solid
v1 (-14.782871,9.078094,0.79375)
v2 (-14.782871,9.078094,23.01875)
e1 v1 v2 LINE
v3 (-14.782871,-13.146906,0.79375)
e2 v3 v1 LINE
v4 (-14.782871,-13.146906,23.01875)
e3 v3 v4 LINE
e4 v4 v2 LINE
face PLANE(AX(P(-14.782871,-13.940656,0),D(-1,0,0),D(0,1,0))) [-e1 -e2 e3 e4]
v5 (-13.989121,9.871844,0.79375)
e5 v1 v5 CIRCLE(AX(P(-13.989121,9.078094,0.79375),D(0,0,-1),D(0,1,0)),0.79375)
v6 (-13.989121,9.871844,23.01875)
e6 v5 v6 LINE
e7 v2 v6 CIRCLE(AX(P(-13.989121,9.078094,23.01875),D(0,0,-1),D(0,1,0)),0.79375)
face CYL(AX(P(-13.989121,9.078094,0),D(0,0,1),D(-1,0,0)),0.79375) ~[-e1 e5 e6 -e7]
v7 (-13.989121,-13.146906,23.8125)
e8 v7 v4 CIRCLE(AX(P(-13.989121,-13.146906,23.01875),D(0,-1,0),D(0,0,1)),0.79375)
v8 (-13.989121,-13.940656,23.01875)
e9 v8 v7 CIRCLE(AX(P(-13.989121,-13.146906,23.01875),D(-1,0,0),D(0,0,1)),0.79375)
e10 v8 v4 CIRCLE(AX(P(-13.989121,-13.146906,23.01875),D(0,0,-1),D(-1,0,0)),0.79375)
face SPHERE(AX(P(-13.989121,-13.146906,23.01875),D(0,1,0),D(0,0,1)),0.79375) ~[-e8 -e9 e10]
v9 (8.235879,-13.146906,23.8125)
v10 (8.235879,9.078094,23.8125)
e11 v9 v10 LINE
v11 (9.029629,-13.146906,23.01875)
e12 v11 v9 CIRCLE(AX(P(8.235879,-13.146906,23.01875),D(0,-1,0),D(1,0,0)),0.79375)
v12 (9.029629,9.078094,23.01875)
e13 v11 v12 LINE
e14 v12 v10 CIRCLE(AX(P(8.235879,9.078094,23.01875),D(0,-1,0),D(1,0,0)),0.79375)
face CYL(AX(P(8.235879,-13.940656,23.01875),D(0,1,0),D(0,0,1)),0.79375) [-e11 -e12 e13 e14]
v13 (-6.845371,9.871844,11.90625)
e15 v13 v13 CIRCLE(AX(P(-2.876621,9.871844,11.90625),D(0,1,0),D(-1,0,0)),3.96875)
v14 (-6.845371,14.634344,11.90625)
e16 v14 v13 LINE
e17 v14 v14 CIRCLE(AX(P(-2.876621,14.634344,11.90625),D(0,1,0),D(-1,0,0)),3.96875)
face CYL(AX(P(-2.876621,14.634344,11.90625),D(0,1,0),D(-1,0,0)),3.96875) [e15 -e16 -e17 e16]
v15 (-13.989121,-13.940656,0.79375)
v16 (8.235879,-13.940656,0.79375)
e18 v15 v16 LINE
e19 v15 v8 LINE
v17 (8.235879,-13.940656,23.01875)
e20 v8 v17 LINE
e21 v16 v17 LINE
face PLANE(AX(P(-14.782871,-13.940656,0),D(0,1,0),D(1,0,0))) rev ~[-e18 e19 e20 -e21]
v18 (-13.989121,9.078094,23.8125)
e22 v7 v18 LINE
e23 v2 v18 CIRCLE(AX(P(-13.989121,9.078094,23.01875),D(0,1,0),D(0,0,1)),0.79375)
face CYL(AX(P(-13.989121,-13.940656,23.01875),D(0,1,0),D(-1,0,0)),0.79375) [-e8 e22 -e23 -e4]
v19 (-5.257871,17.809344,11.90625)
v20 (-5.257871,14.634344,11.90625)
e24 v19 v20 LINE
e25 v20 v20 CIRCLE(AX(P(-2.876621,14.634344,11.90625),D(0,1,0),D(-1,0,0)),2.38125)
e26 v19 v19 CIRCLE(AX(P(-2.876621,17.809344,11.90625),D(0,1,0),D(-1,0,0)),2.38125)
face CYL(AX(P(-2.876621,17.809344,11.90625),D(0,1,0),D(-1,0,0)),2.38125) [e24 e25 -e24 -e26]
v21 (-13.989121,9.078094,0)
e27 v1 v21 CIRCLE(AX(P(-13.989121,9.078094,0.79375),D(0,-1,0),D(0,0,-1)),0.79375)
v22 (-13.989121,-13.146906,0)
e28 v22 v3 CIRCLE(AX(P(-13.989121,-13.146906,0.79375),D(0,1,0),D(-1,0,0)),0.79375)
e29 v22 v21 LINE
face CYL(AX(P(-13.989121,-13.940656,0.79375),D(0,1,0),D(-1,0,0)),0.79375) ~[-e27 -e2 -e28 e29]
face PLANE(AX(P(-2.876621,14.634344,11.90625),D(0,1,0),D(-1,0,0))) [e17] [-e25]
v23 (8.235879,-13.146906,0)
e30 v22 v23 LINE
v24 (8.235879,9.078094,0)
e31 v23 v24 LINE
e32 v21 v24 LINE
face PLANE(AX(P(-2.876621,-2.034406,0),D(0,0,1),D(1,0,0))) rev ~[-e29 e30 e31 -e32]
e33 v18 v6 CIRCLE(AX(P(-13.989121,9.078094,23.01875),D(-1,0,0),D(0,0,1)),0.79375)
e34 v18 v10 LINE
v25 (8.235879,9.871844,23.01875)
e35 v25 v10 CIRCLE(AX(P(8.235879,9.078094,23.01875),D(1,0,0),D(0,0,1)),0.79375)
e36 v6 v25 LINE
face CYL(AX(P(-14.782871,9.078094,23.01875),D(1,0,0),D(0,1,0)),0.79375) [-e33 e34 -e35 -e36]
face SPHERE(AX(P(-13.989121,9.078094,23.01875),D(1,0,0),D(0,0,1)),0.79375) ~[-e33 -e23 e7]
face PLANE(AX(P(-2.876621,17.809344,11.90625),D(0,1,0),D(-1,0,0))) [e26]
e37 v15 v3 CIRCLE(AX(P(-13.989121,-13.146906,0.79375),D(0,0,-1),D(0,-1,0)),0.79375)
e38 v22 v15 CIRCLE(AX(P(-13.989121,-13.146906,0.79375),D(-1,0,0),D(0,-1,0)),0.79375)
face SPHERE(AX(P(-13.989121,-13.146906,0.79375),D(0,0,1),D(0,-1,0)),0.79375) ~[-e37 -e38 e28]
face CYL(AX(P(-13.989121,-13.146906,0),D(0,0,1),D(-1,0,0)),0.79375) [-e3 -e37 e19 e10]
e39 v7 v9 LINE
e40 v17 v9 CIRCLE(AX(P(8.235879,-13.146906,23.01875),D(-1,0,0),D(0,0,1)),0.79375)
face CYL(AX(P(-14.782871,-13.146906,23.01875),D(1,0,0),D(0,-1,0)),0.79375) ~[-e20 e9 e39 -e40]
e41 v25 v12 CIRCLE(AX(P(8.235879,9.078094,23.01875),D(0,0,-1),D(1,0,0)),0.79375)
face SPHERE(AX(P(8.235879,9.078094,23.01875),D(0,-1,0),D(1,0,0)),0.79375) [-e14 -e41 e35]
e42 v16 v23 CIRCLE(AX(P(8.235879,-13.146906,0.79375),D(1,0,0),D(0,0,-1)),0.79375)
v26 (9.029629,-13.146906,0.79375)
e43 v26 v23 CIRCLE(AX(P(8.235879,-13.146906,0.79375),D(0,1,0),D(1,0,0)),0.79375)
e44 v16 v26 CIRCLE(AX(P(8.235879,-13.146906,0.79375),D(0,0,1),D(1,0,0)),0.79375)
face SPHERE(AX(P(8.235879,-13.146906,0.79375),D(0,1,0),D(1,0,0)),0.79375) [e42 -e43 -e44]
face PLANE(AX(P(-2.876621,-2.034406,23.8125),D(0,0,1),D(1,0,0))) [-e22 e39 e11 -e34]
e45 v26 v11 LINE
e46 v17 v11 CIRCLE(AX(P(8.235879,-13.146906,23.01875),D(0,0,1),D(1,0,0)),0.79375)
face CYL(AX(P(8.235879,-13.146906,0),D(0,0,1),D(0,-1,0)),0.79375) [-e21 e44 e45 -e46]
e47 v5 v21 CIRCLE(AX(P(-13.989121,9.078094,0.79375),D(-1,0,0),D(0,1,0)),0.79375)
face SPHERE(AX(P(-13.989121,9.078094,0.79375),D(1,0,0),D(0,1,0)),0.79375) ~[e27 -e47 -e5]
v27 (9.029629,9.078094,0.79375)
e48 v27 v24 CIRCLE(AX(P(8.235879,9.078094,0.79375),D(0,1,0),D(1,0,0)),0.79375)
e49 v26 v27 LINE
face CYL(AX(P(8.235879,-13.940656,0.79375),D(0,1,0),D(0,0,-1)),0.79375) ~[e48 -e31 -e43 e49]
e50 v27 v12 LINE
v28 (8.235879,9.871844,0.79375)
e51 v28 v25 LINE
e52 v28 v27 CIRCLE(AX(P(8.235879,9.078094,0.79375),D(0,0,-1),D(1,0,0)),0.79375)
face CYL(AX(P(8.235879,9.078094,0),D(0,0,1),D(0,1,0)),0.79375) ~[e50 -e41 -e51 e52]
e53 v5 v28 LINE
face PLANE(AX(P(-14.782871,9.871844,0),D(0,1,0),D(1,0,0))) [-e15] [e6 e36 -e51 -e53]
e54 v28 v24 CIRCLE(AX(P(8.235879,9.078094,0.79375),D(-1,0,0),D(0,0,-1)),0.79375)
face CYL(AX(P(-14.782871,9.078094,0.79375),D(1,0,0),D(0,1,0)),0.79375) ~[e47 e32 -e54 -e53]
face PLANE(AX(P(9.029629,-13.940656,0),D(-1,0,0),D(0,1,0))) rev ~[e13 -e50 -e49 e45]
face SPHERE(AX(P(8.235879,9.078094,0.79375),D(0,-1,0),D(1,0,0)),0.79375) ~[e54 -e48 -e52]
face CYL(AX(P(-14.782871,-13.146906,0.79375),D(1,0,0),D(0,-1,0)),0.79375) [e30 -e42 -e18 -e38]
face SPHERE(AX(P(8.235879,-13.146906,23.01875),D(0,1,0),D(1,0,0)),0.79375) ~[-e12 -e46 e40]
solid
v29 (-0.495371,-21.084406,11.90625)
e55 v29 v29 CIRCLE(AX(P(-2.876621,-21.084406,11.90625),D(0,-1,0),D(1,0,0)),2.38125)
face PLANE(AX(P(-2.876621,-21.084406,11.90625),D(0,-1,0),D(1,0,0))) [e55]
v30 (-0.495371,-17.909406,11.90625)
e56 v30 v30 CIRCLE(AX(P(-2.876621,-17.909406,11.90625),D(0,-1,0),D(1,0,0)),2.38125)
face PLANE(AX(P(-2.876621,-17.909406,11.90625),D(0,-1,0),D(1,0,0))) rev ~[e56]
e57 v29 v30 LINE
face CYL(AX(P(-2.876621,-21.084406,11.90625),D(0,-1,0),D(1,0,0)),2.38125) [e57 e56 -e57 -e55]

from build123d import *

# Parameters (mm, degrees)
F0_W      = 23.8125
F0_H      = 23.8125
F1_DEPTH  = 23.8125
F6_R      = 2.38125
F7_DEPTH  = 3.175
F9_R      = 3.96875
F10_DEPTH = 4.7625
F12_R     = 2.38125
F13_DEPTH = 3.175
F14_R     = 0.79375


# Not quite as in the source:
# - a length typed as a fraction of an inch, garbled in the dataset ("3 / 203.2 mm" for 3/8 in), is restored
# - the program builds the solid bodies; features that only make, move or delete a surface that nothing else refers to are left out


with BuildPart() as f1:
    # F0 (on Top) → F1 (new body)
    with BuildSketch(Plane.XY):
        with Locations((-2.8766207397, -2.0344056764)):
            Rectangle(F0_W, F0_H)
    extrude(amount=F1_DEPTH)

    # F9 (on offset) → F10 (join)
    with BuildSketch(Plane(origin=(0, 14.6343443236, 0), x_dir=(-1, 0, 0), z_dir=(0, 1, 0))):
        with Locations((2.8766207397, 11.90625)):
            Circle(F9_R)
    extrude(amount=-F10_DEPTH)

    # F12 (on offset) → F13 (join)
    with BuildSketch(Plane(origin=(0, 17.8093443236, 0), x_dir=(-1, 0, 0), z_dir=(0, 1, 0))):
        with Locations((2.8766207397, 11.90625)):
            Circle(F12_R)
    extrude(amount=-F13_DEPTH)

    # F14
    f14_edges = [f1.edges().sort_by_distance(p)[0] for p in [
        (9.029629, -2.034406, 0),
        (9.029629, -2.034406, 23.8125),
        (9.029629, -13.940656, 11.90625),
        (9.029629, 9.871844, 11.90625),
        (-2.876621, 9.871844, 23.8125),
        (-14.782871, -2.034406, 23.8125),
        (-2.876621, -13.940656, 23.8125),
        (-2.876621, 9.871844, 0),
        (-14.782871, 9.871844, 11.90625),
        (-14.782871, -13.940656, 11.90625),
        (-2.876621, -13.940656, 0),
        (-14.782871, -2.034406, 0),
    ]]
    fillet(f14_edges, radius=F14_R)


with BuildPart() as f7:
    # F6 (on offset) → F7 (new body)
    with BuildSketch(Plane.XZ.offset(21.0844056764)):
        with Locations((-2.8766207397, 11.90625)):
            Circle(F6_R)
    extrude(amount=-F7_DEPTH)


solid = Compound([f1.part, f7.part])
